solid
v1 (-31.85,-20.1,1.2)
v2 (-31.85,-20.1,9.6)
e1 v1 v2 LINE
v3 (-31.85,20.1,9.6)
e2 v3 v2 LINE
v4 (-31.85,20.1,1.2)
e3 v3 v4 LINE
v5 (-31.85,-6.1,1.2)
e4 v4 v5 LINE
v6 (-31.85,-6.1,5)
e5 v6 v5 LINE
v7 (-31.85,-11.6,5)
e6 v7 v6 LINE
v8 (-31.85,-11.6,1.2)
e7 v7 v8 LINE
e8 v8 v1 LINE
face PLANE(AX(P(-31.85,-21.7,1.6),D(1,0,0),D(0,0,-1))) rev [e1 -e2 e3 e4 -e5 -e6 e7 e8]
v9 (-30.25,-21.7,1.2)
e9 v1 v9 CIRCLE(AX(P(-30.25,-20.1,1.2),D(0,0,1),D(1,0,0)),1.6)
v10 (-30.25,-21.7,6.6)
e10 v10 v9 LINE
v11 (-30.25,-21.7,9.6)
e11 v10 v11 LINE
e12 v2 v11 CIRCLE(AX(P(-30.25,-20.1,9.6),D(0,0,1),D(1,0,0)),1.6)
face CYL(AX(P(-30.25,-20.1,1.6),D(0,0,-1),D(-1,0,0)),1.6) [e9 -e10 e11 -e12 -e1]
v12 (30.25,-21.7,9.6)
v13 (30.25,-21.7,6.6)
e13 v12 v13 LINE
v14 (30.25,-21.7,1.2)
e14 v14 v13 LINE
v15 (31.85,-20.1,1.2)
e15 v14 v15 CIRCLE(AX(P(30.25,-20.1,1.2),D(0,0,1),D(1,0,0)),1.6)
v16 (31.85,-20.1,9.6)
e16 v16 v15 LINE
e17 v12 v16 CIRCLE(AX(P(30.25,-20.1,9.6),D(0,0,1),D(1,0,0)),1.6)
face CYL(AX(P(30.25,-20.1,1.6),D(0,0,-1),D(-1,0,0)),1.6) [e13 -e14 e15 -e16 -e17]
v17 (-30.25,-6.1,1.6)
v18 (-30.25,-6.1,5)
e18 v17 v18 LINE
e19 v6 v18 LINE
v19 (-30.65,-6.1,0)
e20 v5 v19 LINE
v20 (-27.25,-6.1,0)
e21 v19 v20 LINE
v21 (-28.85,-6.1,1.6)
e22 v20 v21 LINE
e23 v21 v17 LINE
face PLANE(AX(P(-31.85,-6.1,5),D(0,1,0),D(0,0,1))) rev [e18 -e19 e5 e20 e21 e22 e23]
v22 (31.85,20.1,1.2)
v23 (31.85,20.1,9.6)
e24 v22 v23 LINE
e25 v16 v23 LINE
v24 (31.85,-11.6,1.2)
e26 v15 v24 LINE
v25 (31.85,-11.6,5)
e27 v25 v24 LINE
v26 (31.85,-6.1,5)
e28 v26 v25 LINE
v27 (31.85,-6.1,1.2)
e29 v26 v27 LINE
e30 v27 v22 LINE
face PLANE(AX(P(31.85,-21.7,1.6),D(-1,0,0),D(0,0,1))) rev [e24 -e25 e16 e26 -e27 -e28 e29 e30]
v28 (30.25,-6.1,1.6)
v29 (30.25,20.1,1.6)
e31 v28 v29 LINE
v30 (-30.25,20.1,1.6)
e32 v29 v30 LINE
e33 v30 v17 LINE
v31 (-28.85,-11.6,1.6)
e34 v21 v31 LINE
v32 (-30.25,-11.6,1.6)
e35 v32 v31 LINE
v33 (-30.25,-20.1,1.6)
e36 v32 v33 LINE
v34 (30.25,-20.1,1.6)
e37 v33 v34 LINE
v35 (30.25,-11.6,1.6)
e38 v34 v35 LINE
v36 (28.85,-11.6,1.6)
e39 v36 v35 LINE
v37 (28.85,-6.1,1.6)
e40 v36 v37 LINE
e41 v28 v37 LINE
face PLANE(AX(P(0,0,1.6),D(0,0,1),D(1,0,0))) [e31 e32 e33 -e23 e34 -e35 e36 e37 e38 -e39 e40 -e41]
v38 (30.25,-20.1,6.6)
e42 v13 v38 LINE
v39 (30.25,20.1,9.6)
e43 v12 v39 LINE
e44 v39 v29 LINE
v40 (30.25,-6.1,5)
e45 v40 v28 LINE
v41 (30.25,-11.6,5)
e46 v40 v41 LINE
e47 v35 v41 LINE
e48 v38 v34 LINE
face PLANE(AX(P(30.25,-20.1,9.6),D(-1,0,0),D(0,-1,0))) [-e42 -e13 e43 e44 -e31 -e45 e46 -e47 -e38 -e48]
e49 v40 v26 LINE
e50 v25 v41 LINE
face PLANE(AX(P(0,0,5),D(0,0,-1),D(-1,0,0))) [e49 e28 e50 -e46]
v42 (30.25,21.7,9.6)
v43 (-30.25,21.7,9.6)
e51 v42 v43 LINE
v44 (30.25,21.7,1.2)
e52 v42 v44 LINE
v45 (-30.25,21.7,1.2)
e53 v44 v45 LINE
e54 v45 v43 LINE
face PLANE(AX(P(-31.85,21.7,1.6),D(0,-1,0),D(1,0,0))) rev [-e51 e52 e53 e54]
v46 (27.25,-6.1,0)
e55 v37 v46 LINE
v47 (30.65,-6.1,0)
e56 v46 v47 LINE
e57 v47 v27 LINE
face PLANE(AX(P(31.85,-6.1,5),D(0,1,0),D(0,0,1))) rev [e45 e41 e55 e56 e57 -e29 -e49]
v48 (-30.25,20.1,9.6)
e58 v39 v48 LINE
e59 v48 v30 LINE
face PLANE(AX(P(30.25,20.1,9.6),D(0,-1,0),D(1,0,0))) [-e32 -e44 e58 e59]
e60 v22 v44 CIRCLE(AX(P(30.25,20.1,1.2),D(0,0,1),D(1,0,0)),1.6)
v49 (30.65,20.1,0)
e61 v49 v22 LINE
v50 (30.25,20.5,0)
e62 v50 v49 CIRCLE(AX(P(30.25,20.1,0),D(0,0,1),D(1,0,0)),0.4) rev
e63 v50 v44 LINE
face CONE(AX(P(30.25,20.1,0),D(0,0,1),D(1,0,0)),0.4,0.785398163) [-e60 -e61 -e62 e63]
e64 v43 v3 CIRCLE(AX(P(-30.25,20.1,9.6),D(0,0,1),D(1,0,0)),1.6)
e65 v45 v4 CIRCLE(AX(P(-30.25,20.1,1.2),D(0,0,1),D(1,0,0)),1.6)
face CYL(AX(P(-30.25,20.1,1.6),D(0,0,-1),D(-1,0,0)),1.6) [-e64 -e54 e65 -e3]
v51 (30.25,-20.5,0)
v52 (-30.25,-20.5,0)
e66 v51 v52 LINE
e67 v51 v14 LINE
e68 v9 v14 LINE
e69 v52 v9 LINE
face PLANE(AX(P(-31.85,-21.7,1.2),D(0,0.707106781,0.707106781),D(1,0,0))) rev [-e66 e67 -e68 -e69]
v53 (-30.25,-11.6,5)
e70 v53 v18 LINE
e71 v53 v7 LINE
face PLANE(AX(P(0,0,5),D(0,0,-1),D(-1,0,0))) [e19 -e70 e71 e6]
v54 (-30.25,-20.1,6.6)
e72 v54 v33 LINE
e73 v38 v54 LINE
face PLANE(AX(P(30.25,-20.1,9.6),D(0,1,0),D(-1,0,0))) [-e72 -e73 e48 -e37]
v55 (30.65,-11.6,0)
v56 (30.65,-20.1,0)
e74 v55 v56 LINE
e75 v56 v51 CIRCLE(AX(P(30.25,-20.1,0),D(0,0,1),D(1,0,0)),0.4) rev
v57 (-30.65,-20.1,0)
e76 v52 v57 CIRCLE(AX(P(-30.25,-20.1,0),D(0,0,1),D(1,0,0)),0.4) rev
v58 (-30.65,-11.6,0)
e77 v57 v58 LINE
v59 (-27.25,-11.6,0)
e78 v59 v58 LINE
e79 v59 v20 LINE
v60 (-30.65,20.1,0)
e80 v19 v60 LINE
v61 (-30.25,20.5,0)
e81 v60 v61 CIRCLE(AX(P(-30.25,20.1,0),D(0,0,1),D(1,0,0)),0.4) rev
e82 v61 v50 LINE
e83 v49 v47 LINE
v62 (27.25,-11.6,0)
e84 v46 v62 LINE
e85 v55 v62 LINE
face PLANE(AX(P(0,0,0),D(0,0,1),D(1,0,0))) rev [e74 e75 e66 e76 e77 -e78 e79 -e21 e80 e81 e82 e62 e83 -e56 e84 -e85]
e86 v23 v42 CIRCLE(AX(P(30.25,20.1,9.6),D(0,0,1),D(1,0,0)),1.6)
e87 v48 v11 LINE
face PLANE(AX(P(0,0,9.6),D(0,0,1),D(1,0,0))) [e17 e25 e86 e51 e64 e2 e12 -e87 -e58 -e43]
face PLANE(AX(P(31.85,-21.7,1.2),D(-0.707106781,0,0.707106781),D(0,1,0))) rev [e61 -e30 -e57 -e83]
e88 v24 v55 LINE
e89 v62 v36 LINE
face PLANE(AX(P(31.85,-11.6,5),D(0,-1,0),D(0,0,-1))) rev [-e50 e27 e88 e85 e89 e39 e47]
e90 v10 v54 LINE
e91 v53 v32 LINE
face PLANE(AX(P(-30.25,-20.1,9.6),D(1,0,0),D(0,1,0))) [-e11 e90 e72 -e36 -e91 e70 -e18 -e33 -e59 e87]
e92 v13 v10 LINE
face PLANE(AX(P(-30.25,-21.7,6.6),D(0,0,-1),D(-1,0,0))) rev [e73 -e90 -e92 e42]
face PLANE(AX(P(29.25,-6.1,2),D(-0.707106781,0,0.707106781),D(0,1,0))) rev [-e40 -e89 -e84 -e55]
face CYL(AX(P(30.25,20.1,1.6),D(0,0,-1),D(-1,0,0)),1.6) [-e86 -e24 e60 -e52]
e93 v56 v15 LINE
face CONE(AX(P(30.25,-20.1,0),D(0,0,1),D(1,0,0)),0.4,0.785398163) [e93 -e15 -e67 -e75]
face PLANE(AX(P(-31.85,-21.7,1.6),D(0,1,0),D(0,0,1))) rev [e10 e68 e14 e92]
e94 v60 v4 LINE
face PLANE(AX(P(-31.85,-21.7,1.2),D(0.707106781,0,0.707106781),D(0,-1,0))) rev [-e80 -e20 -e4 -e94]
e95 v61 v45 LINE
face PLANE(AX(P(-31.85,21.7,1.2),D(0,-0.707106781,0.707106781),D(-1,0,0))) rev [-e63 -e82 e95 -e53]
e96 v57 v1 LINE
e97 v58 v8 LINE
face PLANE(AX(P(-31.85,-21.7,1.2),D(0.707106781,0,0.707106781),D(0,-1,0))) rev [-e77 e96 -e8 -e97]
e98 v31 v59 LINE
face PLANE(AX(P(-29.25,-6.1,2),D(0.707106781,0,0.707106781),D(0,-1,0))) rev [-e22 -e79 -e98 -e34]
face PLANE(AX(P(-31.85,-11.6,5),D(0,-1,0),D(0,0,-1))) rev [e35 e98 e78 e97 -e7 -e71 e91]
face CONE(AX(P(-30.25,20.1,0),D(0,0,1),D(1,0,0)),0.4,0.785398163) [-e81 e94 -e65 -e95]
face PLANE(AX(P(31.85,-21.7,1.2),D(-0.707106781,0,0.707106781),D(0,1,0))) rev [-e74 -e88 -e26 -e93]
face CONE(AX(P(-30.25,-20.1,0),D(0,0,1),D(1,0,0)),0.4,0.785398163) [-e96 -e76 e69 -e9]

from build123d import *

# Parameters (mm, degrees)
SKETCH1_W           = 63.7
SKETCH1_H           = 43.4
BOSS_EXTRUDE1_DEPTH = 1.6
SKETCH2_W           = 63.7
SKETCH2_H           = 43.4
SKETCH2_W_2         = 60.5
SKETCH2_H_2         = 40.2
BOSS_EXTRUDE2_DEPTH = 8
SKETCH4_W           = 60.5
SKETCH4_H           = 3
CUT_EXTRUDE1_DEPTH  = 54.421180257
SKETCH5_W           = 2.6
SKETCH5_H           = 5.5
CUT_EXTRUDE2_DEPTH  = 5
CHAMFER1_SIZE       = 2
FILLET1_R           = 1.6
CHAMFER2_SIZE       = 1.2


with BuildPart() as part:
    # Sketch1 → Boss-Extrude1 (new body)
    with BuildSketch(Plane.XY):
        Rectangle(SKETCH1_W, SKETCH1_H)
    extrude(amount=BOSS_EXTRUDE1_DEPTH)

    # Sketch2 → Boss-Extrude2 (add)
    with BuildSketch(Plane.XY.offset(1.6)):
        Rectangle(SKETCH2_W, SKETCH2_H)
        Rectangle(SKETCH2_W_2, SKETCH2_H_2, mode=Mode.SUBTRACT)
    extrude(amount=BOSS_EXTRUDE2_DEPTH)

    # Sketch4 → Cut-Extrude1 (cut, through all)
    with BuildSketch(Plane(origin=(0, -20.1, 0), x_dir=(1, 0, 0), z_dir=(0, 1, 0))):
        with Locations((0, -8.1)):
            Rectangle(SKETCH4_W, SKETCH4_H)
    extrude(amount=-CUT_EXTRUDE1_DEPTH, mode=Mode.SUBTRACT)

    # Sketch5 → Cut-Extrude2 (cut)
    with BuildSketch(Plane(origin=(0, 0, 0), x_dir=(-1, 0, 0), z_dir=(0, 0, -1))):
        with Locations((-30.55, -8.85)):
            Rectangle(SKETCH5_W, SKETCH5_H)
        with Locations((30.55, -8.85)):
            Rectangle(SKETCH5_W, SKETCH5_H)
    extrude(amount=-CUT_EXTRUDE2_DEPTH, mode=Mode.SUBTRACT)

    # Chamfer1
    # the kernel refuses this chamfer: 2 mm, written as the material it takes off along each edge
    with BuildSketch(Plane(origin=(-29.25, -6.1, 0), x_dir=(0.9996219169112968, 0, -0.02749587661058639), z_dir=(0, -1, 0))) as chamfer1_piece_1:
        Polygon((CHAMFER1_SIZE * 0.999621916911, CHAMFER1_SIZE * 0.0274958766106), (-CHAMFER1_SIZE * 0.0274958766106, CHAMFER1_SIZE * 0.999621916911), (0, 0), align=None)
    extrude(amount=5.5, mode=Mode.SUBTRACT)
    with BuildSketch(Plane(origin=(29.25, -6.1, 0), x_dir=(-0.9996219169112968, 0, -0.02749587661058639), z_dir=(0, -1, 0))) as chamfer1_piece_2:
        Polygon((CHAMFER1_SIZE * 0.999621916911, -CHAMFER1_SIZE * 0.0274958766106), (-CHAMFER1_SIZE * 0.0274958766106, -CHAMFER1_SIZE * 0.999621916911), (0, 0), align=None)
    extrude(amount=5.5, mode=Mode.SUBTRACT)

    # Fillet1
    fillet1_edges = [part.edges().sort_by_distance(p)[0] for p in [
        (-31.85, 21.7, 4.8),
        (-31.85, -21.7, 4.8),
        (31.85, -21.7, 4.8),
        (31.85, 21.7, 4.8),
    ]]
    fillet(fillet1_edges, radius=FILLET1_R)

    # Chamfer2
    chamfer2_edges = [part.edges().sort_by_distance(p)[0] for p in [
        (-31.85, 7, 0),
        (0, 21.7, 0),
        (31.85, -15.85, 0),
        (0, -21.7, 0),
        (31.38137085, 21.23137085, 0),
        (31.38137085, -21.23137085, 0),
        (-31.38137085, -21.23137085, 0),
        (-31.38137085, 21.23137085, 0),
        (-31.85, -15.85, 0),
        (31.85, 7, 0),
    ]]
    chamfer(chamfer2_edges, length=CHAMFER2_SIZE)


solid = part.part
